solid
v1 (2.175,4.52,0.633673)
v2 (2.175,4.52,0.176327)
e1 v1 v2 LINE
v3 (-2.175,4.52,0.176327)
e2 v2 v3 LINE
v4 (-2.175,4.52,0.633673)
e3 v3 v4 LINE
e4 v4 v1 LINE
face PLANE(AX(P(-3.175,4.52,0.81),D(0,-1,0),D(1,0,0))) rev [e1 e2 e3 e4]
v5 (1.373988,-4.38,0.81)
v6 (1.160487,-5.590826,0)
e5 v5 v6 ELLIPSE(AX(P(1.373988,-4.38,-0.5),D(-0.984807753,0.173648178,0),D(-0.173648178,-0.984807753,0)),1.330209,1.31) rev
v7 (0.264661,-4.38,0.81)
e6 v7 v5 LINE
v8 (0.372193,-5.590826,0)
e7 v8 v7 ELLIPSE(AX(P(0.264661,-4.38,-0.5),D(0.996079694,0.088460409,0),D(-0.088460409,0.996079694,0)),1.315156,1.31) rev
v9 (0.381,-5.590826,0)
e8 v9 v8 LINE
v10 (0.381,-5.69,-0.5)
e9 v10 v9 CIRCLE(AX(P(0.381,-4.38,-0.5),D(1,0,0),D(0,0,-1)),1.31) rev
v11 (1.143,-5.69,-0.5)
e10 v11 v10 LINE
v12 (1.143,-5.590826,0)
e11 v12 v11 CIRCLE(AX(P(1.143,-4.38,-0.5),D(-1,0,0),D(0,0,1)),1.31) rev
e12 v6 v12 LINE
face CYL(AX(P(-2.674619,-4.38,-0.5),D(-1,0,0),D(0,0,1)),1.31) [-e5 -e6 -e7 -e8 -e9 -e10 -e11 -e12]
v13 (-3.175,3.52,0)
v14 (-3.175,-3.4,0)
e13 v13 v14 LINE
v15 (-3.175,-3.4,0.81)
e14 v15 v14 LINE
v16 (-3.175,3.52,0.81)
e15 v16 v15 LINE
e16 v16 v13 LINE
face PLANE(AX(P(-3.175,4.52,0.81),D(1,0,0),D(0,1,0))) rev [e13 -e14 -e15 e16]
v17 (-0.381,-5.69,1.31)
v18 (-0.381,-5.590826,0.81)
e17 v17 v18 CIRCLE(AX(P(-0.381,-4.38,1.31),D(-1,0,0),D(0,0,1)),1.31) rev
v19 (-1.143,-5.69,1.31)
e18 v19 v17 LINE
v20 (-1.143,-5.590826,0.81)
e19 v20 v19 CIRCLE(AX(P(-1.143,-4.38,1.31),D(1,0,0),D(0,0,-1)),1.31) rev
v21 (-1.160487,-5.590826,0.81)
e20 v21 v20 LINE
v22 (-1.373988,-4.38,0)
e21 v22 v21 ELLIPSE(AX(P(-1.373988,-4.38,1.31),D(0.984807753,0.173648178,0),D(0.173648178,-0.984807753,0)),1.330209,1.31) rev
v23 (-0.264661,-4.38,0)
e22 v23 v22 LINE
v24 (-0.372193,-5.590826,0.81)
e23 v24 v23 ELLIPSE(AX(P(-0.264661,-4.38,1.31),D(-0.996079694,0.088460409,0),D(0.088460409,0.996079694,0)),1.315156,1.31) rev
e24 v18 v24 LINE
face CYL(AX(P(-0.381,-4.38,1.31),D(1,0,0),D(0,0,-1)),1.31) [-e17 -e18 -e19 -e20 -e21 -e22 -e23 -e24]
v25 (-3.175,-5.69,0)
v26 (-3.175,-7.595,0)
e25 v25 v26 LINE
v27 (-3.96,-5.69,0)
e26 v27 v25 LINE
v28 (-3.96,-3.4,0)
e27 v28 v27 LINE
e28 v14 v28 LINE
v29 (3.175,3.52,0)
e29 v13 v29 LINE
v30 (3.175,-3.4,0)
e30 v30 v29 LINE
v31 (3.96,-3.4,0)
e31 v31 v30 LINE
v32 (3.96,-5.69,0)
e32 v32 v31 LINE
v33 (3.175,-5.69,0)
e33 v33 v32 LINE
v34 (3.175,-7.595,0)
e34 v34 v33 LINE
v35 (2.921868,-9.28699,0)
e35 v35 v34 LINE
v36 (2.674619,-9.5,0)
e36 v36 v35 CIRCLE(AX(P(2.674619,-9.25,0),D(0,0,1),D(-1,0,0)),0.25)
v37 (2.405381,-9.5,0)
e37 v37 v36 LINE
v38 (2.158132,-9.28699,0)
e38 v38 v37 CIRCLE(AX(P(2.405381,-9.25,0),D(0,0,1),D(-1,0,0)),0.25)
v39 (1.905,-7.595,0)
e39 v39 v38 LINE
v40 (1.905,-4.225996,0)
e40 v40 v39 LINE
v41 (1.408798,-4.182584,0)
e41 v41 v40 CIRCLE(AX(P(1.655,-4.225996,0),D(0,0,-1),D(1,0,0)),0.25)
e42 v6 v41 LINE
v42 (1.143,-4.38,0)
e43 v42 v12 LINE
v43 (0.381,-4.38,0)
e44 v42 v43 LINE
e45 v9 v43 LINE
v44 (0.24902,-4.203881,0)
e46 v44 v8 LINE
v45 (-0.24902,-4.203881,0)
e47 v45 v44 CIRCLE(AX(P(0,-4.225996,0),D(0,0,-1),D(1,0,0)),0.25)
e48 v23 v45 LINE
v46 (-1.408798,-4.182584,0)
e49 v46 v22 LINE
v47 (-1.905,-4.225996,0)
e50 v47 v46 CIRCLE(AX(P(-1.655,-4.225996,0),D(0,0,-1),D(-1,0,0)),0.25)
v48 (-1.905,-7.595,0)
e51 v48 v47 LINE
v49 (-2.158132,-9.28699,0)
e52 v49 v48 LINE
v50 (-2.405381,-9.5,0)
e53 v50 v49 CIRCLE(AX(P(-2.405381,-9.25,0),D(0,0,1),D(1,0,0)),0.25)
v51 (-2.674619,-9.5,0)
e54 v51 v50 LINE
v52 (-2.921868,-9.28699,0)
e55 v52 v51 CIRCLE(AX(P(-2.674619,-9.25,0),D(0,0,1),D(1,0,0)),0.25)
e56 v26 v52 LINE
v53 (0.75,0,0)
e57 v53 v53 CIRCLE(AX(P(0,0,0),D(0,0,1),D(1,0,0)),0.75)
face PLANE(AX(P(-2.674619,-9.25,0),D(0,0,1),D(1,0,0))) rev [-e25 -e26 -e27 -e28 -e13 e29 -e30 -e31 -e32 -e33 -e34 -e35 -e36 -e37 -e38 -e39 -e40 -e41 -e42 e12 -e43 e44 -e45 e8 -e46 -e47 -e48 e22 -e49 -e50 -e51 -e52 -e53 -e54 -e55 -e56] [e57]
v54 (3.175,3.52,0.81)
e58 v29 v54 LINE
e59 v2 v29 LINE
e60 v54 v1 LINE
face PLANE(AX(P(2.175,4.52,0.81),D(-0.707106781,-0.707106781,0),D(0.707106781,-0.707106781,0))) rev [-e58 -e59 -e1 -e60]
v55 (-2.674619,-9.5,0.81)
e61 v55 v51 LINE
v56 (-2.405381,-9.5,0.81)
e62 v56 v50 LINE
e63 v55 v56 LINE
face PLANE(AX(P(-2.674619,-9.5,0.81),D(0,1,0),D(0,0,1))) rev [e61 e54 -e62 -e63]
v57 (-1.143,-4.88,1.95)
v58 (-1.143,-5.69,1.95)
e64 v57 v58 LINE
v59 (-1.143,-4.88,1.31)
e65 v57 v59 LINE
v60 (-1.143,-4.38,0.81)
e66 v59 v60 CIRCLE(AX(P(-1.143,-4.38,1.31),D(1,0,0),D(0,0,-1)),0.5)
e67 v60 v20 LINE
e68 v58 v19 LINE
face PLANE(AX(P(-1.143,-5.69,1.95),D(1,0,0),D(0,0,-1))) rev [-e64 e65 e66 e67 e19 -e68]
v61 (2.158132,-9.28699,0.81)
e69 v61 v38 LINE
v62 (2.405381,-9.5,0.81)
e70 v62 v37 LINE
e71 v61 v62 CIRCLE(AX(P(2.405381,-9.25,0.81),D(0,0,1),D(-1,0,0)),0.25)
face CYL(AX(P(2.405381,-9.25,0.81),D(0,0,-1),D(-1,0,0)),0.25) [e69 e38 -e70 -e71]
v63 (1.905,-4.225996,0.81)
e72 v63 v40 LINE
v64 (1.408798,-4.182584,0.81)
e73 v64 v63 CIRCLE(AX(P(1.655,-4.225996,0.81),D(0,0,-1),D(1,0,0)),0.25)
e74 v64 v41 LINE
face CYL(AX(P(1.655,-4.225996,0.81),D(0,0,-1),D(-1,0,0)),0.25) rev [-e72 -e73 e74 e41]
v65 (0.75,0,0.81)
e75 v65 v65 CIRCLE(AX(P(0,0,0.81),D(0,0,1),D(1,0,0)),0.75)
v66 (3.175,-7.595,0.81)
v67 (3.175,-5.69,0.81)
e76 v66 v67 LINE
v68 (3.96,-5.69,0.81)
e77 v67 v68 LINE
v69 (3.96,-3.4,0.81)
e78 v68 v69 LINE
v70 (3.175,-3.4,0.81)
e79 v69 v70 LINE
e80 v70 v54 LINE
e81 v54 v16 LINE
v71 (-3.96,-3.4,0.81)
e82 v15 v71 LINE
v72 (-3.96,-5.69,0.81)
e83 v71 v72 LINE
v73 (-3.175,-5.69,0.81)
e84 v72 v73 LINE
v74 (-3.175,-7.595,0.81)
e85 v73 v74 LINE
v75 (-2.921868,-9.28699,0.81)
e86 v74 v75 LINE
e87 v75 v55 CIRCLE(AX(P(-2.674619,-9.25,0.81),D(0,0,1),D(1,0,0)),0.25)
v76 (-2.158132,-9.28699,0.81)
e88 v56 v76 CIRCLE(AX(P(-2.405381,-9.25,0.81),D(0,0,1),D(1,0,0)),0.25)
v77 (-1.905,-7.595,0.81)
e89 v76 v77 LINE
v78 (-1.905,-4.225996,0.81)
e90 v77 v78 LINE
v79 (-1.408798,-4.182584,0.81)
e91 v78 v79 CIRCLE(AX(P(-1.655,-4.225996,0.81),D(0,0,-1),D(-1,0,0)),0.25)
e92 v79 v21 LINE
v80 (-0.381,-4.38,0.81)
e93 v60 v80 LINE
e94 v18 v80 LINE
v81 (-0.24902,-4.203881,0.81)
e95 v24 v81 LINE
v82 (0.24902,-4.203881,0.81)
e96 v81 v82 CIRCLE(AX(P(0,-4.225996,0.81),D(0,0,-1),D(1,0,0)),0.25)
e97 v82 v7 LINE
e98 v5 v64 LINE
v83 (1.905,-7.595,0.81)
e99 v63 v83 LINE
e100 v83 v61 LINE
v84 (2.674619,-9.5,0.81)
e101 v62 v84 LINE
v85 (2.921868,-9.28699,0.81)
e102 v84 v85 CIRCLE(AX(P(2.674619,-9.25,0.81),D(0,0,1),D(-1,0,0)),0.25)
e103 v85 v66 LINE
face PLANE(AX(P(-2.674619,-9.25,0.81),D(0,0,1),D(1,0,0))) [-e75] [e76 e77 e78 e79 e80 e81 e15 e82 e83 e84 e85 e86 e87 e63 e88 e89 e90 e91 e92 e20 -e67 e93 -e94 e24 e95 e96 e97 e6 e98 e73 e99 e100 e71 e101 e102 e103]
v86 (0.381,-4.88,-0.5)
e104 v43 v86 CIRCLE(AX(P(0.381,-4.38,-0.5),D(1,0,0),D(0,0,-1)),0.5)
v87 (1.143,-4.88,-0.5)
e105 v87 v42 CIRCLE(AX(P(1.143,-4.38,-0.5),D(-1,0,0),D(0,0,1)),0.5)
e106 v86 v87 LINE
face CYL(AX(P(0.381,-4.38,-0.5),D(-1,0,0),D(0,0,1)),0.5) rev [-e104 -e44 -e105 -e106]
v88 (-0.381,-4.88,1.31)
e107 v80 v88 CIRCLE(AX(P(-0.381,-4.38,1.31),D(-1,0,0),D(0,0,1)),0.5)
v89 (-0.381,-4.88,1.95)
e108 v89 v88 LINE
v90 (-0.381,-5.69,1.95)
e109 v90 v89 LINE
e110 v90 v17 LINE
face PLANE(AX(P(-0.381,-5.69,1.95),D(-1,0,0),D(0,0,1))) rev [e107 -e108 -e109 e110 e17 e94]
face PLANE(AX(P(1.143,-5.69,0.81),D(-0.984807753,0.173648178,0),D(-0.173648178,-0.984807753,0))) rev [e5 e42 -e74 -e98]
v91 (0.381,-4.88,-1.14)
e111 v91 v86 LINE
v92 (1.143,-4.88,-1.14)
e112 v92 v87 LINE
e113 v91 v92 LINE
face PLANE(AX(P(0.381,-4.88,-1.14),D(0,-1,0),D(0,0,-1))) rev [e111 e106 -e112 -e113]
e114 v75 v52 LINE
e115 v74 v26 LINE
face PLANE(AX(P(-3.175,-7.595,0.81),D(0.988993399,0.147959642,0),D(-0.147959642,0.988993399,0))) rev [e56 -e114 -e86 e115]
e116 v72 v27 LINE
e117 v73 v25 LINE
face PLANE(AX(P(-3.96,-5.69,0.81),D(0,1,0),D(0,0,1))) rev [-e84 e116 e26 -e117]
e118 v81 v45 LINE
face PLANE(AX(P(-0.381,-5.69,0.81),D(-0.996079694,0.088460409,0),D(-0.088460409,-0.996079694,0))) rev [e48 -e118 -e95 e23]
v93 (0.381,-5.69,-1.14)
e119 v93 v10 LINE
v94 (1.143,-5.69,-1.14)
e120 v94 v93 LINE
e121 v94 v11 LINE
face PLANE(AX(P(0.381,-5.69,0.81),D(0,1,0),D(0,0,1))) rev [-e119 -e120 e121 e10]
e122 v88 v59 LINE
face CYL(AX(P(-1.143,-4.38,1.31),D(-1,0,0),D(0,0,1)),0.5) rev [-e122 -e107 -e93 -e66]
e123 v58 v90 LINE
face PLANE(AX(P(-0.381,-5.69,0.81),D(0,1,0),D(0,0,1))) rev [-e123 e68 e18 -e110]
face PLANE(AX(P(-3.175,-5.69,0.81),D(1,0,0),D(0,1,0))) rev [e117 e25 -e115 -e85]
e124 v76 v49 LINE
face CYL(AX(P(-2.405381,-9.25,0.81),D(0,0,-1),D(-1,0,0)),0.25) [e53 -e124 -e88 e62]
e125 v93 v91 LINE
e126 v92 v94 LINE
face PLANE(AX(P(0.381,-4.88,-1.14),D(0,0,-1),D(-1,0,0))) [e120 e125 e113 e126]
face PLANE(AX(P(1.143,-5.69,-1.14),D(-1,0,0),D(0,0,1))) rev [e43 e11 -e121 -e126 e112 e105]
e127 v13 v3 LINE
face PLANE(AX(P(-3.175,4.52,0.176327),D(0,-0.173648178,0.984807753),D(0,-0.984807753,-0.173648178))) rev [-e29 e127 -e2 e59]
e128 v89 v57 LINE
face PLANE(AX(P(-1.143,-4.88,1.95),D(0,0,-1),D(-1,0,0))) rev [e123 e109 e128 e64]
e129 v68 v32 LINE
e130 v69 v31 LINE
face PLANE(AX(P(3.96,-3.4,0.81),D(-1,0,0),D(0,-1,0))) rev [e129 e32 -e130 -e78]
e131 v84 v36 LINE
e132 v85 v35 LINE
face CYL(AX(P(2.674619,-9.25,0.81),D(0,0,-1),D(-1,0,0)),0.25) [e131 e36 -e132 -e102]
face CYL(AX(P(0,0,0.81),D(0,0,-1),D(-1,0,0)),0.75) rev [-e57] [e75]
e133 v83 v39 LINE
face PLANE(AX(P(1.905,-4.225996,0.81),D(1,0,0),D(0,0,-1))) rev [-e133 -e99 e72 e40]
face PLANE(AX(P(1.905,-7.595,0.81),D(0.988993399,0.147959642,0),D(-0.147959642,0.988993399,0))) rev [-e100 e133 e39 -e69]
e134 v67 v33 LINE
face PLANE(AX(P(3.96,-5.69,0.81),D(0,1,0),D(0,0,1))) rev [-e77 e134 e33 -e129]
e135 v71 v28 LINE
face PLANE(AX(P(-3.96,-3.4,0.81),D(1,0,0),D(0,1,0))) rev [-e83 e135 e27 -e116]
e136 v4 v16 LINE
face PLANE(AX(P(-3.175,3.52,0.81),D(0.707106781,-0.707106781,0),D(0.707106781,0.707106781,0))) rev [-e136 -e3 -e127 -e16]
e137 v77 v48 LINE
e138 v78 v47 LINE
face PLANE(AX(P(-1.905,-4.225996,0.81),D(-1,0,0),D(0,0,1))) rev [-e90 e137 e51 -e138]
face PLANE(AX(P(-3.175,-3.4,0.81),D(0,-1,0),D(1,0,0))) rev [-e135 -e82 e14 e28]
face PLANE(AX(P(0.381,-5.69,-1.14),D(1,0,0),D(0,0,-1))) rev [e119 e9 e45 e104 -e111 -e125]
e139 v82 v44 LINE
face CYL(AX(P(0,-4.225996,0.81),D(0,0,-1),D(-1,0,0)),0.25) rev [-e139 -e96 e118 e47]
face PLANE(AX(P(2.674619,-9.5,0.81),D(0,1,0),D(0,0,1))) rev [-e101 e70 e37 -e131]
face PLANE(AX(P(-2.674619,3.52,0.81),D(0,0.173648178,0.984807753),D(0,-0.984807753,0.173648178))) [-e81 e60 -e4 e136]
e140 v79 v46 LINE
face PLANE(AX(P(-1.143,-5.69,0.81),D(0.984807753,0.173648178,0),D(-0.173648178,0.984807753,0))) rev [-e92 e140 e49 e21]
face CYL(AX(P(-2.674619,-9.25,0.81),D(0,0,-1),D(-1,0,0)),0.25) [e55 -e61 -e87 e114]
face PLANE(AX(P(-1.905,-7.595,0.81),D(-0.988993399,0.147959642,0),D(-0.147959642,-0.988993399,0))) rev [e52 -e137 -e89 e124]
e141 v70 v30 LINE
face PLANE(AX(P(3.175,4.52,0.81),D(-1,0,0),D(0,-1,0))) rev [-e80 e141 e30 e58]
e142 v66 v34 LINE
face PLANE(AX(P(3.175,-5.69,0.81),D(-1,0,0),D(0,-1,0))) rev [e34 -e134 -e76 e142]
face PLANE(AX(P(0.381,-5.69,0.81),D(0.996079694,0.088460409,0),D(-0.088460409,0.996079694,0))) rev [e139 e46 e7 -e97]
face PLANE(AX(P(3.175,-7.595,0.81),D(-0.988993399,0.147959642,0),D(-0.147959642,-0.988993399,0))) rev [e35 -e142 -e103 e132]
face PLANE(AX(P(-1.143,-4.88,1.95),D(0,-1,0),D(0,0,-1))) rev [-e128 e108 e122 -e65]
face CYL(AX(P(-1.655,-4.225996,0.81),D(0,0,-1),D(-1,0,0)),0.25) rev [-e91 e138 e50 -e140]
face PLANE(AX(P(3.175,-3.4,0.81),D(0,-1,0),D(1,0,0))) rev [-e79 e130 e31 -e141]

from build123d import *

# Parameters (mm, degrees)
SKETCH1_R      = 0.75
EXTRUDE1_DEPTH = 0.81
CHAMFER4_SIZE  = 1
CHAMFER4_SIZE2 = 0.176326981
CHAMFER5_SIZE  = 1
CHAMFER5_SIZE2 = 0.176326981
CHAMFER1_SIZE  = 1
SKETCH2_W      = 0.762
SKETCH2_H      = 0.81
EXTRUDE2_DEPTH = 1.14
SKETCH3_W      = 0.762
SKETCH3_H      = 0.81
EXTRUDE3_DEPTH = 1.14
FILLET1_R      = 0.5
FILLET2_R      = 1.31


with BuildPart() as part:
    # Sketch1 → Extrude1 (new body)
    with BuildSketch(Plane.XY):
        with BuildLine():
            Line((-3.175, 4.52), (3.175, 4.52))
            Line((3.175, 4.52), (3.175, -3.4))
            Line((3.175, -3.4), (3.96, -3.4))
            Line((3.96, -3.4), (3.96, -5.69))
            Line((3.96, -5.69), (3.175, -5.69))
            Line((3.175, -5.69), (3.175, -7.595))
            Line((3.175, -7.595), (2.921867651, -9.286989911))
            ThreePointArc((2.921867651, -9.286989911), (2.837794855, -9.43940364), (2.674619301, -9.5))
            Line((2.674619301, -9.5), (2.405380699, -9.5))
            ThreePointArc((2.405380699, -9.5), (2.242205145, -9.43940364), (2.158132349, -9.286989911))
            Line((2.158132349, -9.286989911), (1.905, -7.595))
            Line((1.905, -7.595), (1.905, -4.225996329))
            ThreePointArc((1.905, -4.225996329), (1.676788936, -3.976947655), (1.408798062, -4.182584285))
            Line((1.408798062, -4.182584285), (1.143, -5.69))
            Line((1.143, -5.69), (0.381, -5.69))
            Line((0.381, -5.69), (0.249019923, -4.203881227))
            ThreePointArc((0.249019923, -4.203881227), (0, -3.975996329), (-0.249019923, -4.203881227))
            Line((-0.249019923, -4.203881227), (-0.381, -5.69))
            Line((-0.381, -5.69), (-1.143, -5.69))
            Line((-1.143, -5.69), (-1.408798062, -4.182584285))
            ThreePointArc((-1.408798062, -4.182584285), (-1.676788936, -3.976947655), (-1.905, -4.225996329))
            Line((-1.905, -4.225996329), (-1.905, -7.595))
            Line((-1.905, -7.595), (-2.158132349, -9.286989911))
            ThreePointArc((-2.158132349, -9.286989911), (-2.242205145, -9.43940364), (-2.405380699, -9.5))
            Line((-2.405380699, -9.5), (-2.674619301, -9.5))
            ThreePointArc((-2.674619301, -9.5), (-2.837794855, -9.43940364), (-2.921867651, -9.286989911))
            Line((-2.921867651, -9.286989911), (-3.175, -7.595))
            Line((-3.175, -7.595), (-3.175, -5.69))
            Line((-3.175, -5.69), (-3.96, -5.69))
            Line((-3.96, -5.69), (-3.96, -3.4))
            Line((-3.96, -3.4), (-3.175, -3.4))
            Line((-3.175, -3.4), (-3.175, 4.52))
        make_face()
        Circle(SKETCH1_R, mode=Mode.SUBTRACT)
    extrude(amount=EXTRUDE1_DEPTH)

    # Chamfer4
    chamfer4_edges = [part.edges().sort_by_distance(p)[0] for p in [
        (0, 4.52, 0.81),
    ]]
    chamfer4_side = [part.faces().sort_by_distance(p)[0] for p in [
        (0, -1.422995991, 0.81),
    ]]
    chamfer(chamfer4_edges, length=CHAMFER4_SIZE, length2=CHAMFER4_SIZE2, reference=chamfer4_side[0])

    # Chamfer5
    chamfer5_edges = [part.edges().sort_by_distance(p)[0] for p in [
        (0, 4.52, 0),
    ]]
    chamfer5_side = [part.faces().sort_by_distance(p)[0] for p in [
        (0, -1.422995991, 0),
    ]]
    chamfer(chamfer5_edges, length=CHAMFER5_SIZE, length2=CHAMFER5_SIZE2, reference=chamfer5_side[0])

    # Chamfer1
    chamfer1_edges = [part.edges().sort_by_distance(p)[0] for p in [
        (-3.175, 4.52, 0.405),
        (3.175, 4.52, 0.405),
    ]]
    chamfer(chamfer1_edges, length=CHAMFER1_SIZE)

    # Sketch2 → Extrude2 (add)
    with BuildSketch(Plane.XY.offset(0.81)):
        with Locations((-0.762, -5.285)):
            Rectangle(SKETCH2_W, SKETCH2_H)
    extrude(amount=EXTRUDE2_DEPTH)

    # Sketch3 → Extrude3 (add)
    with BuildSketch(Plane(origin=(0, 0, 0), x_dir=(-1, 0, 0), z_dir=(0, 0, -1))):
        with Locations((-0.762, -5.285)):
            Rectangle(SKETCH3_W, SKETCH3_H)
    extrude(amount=EXTRUDE3_DEPTH)

    # Fillet1
    fillet1_edges = [part.edges().sort_by_distance(p)[0] for p in [
        (-0.762, -4.88, 0.81),
        (0.762, -4.88, 0),
    ]]
    fillet(fillet1_edges, radius=FILLET1_R)

    # Fillet2
    # the kernel refuses this fillet: 1.31 mm, written as the material it takes off along each edge
    with BuildSketch(Plane(origin=(2.894, -5.69, 0), x_dir=(0, 1, 0), z_dir=(-1, 0, 0))) as fillet2_piece_1_section:
        with BuildLine():
            CenterArc((FILLET2_R, -FILLET2_R), FILLET2_R, 90, 90)
            Line((0, -FILLET2_R), (0, 0))
            Line((0, 0), (FILLET2_R, 0))
        make_face()
    fillet2_piece_1 = extrude(amount=7.312, mode=Mode.PRIVATE)
    fillet2_piece_1 = split(fillet2_piece_1, bisect_by=Plane(origin=(-1.183630383, -5.45957365, 0.262964563), z_dir=(0.984807753012208, 0.17364817766693083, 0)), keep=Keep.TOP, mode=Mode.PRIVATE)
    fillet2_piece_1 = split(fillet2_piece_1, bisect_by=Plane(origin=(0.345201257, -5.286899882, 0.262964563), z_dir=(-0.9960796936325239, -0.08846040884450787, 0)), keep=Keep.TOP, mode=Mode.PRIVATE)
    add(fillet2_piece_1, mode=Mode.SUBTRACT)
    with BuildSketch(Plane(origin=(4.418, -5.69, 0.81), x_dir=(0, 1, 0), z_dir=(-1, 0, 0))) as fillet2_piece_2_section:
        with BuildLine():
            CenterArc((FILLET2_R, FILLET2_R), FILLET2_R, 180, 90)
            Line((0, FILLET2_R), (0, 0))
            Line((0, 0), (FILLET2_R, 0))
        make_face()
    fillet2_piece_2 = extrude(amount=7.312, mode=Mode.PRIVATE)
    fillet2_piece_2 = split(fillet2_piece_2, bisect_by=Plane(origin=(1.905, -5.189166234, 0.641921168), z_dir=(-1, 0, 0)), keep=Keep.TOP, mode=Mode.PRIVATE)
    fillet2_piece_2 = split(fillet2_piece_2, bisect_by=Plane(origin=(0.343178087, -5.264118635, 0.641921168), z_dir=(0.9960796936325239, 0.08846040884450787, 0)), keep=Keep.TOP, mode=Mode.PRIVATE)
    add(fillet2_piece_2, mode=Mode.SUBTRACT)


solid = part.part
